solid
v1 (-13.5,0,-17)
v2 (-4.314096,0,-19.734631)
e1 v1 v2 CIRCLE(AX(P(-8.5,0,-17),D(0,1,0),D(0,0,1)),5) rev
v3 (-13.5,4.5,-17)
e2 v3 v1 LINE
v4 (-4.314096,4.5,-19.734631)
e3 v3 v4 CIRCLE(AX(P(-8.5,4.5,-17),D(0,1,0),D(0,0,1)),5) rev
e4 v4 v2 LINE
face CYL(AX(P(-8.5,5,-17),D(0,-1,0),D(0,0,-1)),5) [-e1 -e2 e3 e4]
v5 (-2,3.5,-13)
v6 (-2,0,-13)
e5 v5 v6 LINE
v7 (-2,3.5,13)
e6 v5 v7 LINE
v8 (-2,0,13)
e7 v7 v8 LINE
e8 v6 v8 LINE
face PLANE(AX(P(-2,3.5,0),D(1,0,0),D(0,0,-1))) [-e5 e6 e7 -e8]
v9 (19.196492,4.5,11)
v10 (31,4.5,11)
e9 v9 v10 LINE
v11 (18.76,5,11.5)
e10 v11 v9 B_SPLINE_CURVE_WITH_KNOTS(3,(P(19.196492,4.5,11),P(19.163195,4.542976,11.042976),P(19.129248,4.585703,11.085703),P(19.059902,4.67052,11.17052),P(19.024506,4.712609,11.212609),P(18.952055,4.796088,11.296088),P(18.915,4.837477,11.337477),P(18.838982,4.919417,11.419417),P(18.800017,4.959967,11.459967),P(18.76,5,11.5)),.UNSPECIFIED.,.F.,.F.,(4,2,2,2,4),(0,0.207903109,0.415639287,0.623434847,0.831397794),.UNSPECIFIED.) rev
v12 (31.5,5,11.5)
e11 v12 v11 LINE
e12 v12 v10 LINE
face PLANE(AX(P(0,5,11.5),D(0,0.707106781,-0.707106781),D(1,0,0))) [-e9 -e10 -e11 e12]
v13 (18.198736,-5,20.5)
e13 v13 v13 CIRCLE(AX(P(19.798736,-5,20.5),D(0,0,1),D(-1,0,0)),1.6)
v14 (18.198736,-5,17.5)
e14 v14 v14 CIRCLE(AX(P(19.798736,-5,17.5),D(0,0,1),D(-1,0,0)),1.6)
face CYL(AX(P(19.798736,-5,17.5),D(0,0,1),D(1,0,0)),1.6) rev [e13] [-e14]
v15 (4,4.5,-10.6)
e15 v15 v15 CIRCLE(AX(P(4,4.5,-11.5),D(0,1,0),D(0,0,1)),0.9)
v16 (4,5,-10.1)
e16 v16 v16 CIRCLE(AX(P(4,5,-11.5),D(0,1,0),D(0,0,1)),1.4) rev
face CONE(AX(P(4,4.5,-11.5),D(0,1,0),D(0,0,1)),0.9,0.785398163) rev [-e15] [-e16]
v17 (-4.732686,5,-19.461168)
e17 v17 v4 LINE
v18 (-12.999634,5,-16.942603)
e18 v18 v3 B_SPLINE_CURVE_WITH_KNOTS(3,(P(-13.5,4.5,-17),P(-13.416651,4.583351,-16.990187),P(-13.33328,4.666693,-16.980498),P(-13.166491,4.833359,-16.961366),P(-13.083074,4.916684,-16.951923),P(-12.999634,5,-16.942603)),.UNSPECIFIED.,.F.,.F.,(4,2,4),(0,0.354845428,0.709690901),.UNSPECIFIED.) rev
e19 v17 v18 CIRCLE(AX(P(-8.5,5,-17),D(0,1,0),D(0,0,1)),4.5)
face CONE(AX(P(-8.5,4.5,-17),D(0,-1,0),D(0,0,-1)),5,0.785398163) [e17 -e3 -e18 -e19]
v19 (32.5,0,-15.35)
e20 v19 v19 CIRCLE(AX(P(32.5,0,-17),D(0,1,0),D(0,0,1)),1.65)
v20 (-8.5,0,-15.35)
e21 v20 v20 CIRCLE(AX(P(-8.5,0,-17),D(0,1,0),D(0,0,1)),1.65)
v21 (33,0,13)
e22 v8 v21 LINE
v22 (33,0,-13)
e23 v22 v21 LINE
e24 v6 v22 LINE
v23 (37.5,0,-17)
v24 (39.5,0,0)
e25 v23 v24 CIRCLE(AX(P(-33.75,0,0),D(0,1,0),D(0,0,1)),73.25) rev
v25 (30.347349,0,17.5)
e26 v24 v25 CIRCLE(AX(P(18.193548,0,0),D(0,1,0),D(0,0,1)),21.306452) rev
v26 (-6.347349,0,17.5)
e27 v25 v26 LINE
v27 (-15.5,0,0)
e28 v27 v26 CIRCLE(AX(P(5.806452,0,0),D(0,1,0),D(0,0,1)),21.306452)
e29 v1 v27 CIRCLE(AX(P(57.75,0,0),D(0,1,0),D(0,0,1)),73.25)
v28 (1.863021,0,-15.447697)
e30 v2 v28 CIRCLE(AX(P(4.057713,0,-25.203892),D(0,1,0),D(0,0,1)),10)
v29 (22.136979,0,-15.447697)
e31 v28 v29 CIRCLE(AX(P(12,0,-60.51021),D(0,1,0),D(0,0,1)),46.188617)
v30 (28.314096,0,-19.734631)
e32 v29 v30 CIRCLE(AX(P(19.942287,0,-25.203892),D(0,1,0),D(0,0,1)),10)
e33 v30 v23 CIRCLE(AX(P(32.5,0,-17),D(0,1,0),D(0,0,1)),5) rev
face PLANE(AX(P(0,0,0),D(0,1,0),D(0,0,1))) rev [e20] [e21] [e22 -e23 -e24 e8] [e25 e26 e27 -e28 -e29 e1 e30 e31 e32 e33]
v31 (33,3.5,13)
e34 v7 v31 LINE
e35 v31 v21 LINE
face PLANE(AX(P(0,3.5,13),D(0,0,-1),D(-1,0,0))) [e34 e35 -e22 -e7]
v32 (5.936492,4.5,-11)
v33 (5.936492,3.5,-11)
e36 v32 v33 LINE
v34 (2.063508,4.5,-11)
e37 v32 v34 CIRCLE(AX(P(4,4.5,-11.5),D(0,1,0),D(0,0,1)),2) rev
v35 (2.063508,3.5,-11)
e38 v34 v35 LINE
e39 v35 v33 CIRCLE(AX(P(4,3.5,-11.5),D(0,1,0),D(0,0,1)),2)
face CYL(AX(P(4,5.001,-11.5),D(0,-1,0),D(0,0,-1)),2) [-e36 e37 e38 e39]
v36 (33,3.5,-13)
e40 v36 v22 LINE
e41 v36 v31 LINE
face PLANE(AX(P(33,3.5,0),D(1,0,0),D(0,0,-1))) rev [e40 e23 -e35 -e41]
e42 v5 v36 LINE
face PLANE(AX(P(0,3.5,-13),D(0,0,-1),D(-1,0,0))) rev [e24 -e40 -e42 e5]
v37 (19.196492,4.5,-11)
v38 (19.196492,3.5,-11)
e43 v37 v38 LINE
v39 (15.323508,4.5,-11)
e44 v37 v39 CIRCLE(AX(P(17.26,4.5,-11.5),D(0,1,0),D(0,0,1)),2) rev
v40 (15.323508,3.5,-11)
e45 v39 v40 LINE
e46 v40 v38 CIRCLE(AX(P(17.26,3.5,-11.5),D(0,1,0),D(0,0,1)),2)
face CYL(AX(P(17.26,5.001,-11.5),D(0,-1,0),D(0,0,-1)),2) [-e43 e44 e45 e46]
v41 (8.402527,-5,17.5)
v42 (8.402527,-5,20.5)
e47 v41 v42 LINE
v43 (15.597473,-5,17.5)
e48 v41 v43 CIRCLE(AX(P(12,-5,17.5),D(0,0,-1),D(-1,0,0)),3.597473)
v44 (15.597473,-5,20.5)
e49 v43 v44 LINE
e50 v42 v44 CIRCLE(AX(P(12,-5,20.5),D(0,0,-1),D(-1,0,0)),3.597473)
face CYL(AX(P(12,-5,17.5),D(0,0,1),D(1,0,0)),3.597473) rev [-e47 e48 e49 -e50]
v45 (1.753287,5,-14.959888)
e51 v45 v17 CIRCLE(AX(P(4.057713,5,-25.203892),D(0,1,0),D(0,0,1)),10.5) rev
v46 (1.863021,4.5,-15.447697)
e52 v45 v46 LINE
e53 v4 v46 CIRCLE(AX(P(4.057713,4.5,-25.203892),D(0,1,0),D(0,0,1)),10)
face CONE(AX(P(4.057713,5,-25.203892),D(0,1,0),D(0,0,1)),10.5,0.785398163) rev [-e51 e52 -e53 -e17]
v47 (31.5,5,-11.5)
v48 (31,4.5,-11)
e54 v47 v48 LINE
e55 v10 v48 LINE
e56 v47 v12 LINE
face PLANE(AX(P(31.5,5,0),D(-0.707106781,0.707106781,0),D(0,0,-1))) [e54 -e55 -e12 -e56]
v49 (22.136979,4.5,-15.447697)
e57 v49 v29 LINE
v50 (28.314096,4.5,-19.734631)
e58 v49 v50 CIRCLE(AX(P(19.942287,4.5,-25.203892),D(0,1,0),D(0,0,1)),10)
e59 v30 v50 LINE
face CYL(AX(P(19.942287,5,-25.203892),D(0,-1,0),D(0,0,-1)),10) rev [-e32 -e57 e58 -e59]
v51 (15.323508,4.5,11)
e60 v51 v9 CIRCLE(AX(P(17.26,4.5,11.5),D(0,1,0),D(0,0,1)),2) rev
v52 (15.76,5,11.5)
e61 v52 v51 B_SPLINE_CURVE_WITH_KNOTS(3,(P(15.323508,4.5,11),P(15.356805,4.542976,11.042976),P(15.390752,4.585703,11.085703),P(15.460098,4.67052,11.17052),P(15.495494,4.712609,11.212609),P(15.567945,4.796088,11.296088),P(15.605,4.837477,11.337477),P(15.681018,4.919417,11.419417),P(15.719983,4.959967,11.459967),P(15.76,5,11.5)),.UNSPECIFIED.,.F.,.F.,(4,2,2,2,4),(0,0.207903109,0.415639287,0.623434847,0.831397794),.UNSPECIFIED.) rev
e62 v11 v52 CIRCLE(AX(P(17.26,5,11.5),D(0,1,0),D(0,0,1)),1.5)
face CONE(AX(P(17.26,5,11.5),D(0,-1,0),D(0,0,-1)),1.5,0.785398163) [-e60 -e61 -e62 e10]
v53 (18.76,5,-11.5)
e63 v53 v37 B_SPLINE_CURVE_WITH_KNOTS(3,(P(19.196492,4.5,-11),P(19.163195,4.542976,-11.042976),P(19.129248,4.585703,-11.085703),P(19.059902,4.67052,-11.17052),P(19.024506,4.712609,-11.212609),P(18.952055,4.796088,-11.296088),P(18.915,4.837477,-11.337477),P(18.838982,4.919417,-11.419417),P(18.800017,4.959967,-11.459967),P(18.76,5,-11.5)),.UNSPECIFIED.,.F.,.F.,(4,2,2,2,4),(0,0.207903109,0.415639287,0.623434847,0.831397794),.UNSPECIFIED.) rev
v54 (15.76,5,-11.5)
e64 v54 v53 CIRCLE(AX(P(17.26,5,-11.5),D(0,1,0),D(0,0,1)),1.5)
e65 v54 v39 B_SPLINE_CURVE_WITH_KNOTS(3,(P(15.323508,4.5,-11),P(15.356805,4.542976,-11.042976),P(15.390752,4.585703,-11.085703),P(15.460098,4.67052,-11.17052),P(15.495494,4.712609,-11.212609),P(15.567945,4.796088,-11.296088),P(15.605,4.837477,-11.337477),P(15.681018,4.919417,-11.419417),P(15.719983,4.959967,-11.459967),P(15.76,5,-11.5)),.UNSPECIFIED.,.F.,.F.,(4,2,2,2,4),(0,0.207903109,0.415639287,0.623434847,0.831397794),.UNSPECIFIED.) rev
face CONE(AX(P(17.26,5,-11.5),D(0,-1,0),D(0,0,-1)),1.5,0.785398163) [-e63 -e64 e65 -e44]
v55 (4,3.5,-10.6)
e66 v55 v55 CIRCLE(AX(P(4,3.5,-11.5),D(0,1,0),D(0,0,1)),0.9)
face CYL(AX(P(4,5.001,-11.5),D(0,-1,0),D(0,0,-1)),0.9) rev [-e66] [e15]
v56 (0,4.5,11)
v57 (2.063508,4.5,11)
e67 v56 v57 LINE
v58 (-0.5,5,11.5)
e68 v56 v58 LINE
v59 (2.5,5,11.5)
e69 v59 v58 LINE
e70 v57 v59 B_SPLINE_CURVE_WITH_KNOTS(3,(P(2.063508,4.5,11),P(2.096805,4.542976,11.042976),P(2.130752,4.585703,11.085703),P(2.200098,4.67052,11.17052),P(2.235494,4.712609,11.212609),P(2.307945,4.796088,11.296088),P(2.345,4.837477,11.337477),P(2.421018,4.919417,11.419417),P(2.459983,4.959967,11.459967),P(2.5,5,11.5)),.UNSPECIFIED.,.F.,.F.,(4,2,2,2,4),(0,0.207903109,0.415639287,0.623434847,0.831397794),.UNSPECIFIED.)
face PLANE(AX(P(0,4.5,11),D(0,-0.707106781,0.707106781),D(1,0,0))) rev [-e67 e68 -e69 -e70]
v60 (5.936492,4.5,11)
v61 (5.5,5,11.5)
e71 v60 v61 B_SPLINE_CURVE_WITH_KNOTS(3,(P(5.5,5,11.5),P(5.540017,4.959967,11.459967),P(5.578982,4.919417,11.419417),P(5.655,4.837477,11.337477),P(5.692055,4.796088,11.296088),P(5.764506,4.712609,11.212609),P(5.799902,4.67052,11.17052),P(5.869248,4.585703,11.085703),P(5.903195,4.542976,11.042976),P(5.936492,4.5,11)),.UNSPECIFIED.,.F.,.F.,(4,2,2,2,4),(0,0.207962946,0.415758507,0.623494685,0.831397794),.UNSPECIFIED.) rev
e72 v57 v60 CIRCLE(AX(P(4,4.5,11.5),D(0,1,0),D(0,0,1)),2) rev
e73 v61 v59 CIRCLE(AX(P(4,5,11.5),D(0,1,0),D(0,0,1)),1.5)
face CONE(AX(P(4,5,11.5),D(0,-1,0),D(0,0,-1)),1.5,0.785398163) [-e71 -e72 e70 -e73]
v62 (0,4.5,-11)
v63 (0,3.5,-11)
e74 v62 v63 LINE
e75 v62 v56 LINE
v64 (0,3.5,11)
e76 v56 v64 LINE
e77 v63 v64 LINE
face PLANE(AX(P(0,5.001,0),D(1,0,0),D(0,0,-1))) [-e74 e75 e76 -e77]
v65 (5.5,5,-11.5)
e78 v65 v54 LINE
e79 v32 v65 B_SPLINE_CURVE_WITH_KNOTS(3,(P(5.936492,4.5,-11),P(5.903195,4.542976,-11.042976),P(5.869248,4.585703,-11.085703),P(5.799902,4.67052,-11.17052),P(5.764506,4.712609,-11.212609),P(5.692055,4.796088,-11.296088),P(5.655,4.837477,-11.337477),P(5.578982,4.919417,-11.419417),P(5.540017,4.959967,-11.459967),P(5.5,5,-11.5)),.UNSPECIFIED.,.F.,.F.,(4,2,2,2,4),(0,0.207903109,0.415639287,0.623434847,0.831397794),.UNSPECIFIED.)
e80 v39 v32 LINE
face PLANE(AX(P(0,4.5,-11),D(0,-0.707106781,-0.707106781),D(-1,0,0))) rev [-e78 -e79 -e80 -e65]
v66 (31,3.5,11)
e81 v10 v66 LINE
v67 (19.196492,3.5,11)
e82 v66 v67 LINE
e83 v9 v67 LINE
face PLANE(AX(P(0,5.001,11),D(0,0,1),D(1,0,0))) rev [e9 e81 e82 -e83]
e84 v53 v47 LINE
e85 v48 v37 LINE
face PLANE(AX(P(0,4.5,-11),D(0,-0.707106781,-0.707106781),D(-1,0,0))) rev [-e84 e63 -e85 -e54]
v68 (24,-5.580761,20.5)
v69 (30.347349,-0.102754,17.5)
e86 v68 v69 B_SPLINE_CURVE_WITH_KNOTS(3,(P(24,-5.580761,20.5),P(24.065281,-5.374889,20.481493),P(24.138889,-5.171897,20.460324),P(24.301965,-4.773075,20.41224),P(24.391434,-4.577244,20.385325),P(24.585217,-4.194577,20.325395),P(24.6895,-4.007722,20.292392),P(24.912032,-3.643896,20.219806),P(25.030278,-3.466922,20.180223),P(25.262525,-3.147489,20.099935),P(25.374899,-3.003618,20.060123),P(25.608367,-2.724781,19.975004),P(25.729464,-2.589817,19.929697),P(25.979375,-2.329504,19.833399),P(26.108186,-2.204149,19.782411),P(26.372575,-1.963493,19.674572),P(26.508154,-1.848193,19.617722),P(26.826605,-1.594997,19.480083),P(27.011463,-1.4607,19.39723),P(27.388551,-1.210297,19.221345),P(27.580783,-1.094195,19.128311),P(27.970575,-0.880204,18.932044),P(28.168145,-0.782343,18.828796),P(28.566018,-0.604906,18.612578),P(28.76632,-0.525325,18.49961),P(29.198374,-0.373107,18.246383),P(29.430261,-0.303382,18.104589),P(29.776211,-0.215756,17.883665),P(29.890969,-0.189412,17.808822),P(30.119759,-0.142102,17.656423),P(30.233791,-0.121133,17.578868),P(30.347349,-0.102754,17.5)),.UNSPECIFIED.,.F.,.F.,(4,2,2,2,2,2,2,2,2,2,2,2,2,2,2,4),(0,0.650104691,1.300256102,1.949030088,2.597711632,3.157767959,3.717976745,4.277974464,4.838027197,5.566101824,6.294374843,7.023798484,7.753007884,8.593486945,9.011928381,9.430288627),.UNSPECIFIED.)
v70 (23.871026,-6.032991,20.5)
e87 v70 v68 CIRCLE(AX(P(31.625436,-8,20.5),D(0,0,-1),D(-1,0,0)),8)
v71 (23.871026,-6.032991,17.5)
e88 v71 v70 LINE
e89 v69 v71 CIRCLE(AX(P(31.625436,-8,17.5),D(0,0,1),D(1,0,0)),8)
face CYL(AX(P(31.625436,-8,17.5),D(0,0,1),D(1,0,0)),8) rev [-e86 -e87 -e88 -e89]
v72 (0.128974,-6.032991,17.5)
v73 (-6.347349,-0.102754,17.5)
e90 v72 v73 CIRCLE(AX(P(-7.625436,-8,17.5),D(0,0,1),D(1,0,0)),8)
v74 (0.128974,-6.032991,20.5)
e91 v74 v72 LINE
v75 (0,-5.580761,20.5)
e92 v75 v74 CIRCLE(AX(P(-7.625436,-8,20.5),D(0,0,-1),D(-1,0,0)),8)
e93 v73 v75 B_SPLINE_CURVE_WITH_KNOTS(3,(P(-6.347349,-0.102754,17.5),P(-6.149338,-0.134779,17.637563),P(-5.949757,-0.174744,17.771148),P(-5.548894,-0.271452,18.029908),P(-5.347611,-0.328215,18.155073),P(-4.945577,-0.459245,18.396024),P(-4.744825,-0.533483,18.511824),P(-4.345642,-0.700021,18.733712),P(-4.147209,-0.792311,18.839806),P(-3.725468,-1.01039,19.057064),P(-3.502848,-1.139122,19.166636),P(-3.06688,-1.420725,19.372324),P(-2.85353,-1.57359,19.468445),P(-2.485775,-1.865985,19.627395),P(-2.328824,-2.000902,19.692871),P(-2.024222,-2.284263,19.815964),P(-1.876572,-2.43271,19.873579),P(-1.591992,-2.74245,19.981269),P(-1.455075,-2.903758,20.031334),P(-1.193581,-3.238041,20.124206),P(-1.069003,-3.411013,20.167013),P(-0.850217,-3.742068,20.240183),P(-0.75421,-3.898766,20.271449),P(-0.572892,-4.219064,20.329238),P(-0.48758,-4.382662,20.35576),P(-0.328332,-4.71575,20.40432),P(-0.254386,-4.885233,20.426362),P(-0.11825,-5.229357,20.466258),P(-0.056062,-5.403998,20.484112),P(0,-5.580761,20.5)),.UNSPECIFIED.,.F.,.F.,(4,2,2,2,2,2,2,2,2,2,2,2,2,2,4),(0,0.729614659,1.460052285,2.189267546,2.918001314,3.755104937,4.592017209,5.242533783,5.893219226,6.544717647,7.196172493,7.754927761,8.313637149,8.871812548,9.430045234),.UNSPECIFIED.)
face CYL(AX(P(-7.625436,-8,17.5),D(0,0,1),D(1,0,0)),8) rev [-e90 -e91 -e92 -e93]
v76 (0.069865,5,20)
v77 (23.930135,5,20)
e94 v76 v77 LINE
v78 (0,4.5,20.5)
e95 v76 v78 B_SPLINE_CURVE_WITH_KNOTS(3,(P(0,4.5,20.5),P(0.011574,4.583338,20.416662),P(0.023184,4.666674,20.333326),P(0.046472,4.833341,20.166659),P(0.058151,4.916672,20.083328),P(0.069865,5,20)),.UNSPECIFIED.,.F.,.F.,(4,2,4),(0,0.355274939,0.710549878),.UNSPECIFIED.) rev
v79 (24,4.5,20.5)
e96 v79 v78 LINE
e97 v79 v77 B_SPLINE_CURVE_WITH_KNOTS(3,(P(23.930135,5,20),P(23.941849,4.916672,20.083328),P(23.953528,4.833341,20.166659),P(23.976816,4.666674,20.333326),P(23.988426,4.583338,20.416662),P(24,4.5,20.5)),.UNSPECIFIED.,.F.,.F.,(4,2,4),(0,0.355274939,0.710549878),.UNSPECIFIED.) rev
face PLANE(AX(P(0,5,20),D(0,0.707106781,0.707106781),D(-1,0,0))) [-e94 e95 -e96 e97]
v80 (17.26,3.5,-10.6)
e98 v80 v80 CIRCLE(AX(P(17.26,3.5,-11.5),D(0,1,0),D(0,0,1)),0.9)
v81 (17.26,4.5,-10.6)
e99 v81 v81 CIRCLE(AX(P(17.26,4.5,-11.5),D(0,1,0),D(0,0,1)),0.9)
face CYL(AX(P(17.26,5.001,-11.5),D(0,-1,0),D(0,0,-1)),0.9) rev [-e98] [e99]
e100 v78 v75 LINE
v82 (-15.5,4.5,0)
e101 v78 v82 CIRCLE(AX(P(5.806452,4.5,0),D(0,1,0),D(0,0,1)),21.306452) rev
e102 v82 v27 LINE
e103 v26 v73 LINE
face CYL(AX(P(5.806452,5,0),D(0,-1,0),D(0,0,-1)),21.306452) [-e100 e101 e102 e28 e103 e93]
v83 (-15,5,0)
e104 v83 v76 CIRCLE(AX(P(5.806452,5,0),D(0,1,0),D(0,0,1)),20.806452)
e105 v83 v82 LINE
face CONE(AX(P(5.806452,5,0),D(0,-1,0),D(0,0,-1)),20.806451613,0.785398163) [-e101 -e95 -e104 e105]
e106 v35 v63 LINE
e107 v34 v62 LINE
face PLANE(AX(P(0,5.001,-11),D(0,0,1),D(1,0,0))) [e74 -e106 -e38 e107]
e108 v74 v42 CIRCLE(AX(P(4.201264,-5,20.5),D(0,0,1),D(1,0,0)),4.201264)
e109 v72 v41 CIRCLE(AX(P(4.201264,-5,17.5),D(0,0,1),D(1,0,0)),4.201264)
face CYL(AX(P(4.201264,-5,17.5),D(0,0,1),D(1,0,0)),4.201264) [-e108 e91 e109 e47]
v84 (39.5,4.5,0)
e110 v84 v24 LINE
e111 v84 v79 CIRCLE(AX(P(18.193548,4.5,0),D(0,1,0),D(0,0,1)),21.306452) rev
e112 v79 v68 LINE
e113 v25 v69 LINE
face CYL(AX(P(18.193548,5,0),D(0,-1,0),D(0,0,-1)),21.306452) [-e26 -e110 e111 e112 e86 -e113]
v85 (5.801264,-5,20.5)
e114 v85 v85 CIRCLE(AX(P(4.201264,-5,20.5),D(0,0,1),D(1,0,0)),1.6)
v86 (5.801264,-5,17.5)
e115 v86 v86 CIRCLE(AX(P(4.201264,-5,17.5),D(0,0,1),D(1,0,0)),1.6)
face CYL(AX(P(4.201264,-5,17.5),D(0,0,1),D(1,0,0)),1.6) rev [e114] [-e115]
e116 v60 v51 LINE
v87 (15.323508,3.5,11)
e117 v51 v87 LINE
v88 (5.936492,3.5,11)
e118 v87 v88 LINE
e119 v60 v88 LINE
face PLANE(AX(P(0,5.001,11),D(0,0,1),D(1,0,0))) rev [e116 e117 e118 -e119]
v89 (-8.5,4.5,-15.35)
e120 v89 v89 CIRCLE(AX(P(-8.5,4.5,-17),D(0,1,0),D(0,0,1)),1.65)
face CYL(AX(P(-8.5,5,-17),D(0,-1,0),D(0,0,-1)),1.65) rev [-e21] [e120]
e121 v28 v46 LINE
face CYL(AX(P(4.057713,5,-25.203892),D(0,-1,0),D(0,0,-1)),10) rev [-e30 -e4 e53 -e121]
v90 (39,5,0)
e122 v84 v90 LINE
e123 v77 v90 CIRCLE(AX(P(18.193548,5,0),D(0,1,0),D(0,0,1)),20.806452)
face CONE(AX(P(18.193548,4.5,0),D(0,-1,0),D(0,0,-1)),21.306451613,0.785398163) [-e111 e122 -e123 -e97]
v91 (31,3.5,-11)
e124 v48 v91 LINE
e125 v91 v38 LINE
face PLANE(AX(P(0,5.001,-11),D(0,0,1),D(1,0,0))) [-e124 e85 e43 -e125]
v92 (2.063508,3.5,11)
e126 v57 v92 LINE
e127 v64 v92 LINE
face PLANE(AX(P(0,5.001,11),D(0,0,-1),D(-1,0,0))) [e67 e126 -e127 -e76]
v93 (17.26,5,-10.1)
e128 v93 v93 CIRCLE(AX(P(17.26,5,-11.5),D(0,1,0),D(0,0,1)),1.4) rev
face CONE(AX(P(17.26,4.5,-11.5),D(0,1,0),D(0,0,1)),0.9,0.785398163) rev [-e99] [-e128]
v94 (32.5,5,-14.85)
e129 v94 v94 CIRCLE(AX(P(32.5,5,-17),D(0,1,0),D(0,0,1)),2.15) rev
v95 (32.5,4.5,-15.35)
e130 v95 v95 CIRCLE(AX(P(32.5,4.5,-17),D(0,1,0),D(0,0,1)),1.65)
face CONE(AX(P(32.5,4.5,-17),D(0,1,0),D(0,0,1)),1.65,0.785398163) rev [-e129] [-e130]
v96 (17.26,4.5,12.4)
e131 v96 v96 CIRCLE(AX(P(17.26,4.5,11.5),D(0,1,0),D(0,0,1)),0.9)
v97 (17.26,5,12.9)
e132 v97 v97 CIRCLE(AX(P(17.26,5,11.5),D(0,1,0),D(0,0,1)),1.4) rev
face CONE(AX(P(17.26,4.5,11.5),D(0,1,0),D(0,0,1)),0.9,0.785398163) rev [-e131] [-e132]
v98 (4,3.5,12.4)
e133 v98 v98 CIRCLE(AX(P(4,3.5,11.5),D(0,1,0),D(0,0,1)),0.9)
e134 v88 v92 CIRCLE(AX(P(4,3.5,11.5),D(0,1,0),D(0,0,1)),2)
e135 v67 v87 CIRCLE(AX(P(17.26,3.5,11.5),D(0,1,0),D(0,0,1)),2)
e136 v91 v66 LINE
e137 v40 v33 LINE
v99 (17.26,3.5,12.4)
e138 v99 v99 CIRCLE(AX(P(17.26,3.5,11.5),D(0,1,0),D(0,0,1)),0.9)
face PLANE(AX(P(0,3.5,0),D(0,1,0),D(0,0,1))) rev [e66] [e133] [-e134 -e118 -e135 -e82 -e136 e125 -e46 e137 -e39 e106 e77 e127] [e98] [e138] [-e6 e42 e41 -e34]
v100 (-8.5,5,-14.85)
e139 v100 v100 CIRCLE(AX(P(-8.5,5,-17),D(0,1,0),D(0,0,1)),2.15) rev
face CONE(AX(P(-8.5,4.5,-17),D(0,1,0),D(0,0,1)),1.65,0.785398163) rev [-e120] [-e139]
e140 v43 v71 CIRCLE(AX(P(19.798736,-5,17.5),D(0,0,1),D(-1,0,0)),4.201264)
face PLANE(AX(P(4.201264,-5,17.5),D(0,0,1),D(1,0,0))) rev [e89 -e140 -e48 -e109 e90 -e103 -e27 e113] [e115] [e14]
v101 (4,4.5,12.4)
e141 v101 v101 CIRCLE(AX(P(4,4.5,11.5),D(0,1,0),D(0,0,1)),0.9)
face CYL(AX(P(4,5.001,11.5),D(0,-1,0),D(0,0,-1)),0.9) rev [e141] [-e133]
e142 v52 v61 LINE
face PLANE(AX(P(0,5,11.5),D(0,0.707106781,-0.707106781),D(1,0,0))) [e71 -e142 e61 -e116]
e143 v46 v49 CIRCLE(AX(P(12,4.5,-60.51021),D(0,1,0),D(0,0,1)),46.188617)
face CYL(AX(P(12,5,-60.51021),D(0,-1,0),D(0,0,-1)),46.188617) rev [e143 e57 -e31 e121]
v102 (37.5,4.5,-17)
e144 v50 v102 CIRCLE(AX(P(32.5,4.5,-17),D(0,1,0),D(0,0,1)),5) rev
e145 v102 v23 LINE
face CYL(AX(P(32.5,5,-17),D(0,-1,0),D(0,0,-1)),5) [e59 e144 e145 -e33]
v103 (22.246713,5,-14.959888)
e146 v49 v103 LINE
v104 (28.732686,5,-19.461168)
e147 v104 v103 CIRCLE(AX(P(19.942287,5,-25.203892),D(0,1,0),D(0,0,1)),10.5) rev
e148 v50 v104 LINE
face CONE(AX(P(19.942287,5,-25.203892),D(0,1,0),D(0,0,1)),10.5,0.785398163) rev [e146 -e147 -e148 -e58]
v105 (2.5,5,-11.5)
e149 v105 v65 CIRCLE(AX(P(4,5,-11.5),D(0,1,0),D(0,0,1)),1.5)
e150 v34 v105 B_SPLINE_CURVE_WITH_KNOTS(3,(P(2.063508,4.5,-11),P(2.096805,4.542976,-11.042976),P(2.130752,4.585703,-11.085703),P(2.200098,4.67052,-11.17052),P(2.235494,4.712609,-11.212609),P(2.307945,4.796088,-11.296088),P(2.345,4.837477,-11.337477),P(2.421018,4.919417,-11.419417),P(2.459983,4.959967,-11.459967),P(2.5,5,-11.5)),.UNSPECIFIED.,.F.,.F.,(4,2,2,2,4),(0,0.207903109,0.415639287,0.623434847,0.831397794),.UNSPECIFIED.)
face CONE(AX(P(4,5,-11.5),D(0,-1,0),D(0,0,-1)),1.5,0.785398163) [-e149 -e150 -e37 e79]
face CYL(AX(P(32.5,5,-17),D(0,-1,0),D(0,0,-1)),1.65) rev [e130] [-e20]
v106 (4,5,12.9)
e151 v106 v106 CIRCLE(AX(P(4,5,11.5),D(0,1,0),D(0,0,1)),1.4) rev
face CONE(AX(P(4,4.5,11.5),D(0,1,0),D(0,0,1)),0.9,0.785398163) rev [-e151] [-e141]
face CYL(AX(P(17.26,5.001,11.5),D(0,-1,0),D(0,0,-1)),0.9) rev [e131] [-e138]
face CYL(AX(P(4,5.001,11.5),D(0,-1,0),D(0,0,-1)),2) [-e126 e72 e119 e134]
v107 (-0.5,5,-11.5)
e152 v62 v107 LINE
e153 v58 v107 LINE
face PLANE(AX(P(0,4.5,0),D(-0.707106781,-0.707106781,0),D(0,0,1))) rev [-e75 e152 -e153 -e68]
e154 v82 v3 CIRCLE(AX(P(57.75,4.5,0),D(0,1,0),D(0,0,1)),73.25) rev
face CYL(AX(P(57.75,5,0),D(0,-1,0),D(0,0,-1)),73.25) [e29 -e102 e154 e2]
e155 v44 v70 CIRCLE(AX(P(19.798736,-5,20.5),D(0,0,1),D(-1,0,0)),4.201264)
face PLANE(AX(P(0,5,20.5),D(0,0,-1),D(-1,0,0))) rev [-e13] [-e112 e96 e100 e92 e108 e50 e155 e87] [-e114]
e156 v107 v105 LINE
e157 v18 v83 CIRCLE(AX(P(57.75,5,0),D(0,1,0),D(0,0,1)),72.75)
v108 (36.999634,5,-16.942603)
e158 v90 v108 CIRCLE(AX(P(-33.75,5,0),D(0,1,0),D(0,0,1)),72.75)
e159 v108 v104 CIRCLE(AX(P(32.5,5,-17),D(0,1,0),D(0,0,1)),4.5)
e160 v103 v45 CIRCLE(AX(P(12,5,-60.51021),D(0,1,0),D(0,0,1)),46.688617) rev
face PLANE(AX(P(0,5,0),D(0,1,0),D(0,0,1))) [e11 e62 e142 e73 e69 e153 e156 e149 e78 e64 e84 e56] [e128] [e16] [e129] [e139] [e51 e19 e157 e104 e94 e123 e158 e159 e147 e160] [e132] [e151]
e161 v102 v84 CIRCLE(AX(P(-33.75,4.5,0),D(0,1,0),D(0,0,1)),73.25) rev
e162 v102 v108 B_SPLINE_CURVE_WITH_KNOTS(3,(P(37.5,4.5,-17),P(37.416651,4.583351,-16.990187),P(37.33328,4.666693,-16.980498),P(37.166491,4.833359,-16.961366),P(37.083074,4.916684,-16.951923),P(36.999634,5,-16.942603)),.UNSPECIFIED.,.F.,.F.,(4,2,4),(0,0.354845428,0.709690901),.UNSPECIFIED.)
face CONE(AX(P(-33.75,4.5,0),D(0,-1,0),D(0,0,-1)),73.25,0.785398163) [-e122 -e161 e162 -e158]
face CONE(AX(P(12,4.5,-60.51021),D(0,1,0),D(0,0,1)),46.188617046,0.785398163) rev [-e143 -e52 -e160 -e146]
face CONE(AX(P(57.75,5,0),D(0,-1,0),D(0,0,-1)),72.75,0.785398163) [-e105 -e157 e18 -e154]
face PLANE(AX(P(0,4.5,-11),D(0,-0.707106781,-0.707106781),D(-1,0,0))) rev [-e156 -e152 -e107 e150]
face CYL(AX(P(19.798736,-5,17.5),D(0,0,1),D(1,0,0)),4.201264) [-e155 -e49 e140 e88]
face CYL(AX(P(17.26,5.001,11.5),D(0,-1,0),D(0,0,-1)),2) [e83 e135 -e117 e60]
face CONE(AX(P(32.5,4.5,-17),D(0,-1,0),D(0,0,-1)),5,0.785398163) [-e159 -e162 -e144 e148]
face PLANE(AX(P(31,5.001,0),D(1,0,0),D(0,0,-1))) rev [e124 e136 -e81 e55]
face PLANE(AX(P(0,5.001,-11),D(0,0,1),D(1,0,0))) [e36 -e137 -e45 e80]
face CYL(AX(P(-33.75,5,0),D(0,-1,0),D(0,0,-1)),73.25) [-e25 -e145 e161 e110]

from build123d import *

# Parameters (mm, degrees)
COMPLETE_SKETCH_R               = 1.6
COMPLETE_SKETCH_R_2             = 1.65
BODY_DEPTH                      = 5
SMOOTHING_FILLET_R              = 10
CUT_EXTRUDE1_START              = -5
SKETCH1_R                       = 0.9
CUT_EXTRUDE1_DEPTH              = 5
CUT_EXTRUDE2_START              = -5
SKETCH1_4_W                     = 35
SKETCH1_4_H                     = 26
CUT_EXTRUDE2_DEPTH              = 3.5
ELEPHANTSFOOT_COMPENSATION_SIZE = 0.5
SKETCH5_R                       = 1.6
BOSS_EXTRUDE3_DEPTH             = 3
FILLET3_R                       = 8


with BuildPart() as part:
    # complete_sketch → body (new body)
    with BuildSketch(Plane(origin=(0, 0, 0), x_dir=(1, 0, 0), z_dir=(0, 1, 0))):
        with BuildLine():
            Line((0, -20.5), (24, -20.5))
            ThreePointArc((24, -20.5), (35.188838333, -12.850097276), (39.5, 0))
            ThreePointArc((39.5, 0), (38.998281767, 8.558621384), (37.5, 17))
            ThreePointArc((37.5, 17), (32.5, 22), (27.5, 17))
            ThreePointArc((27.5, 17), (12, 14.321592614), (-3.5, 17))
            ThreePointArc((-3.5, 17), (-8.5, 22), (-13.5, 17))
            ThreePointArc((-13.5, 17), (-14.998281767, 8.558621384), (-15.5, 0))
            ThreePointArc((-15.5, 0), (-11.188838333, -12.850097276), (0, -20.5))
        make_face()
        with Locations(Location((24, 0, 0), (0, 0, 270))):
            Circle(COMPLETE_SKETCH_R, mode=Mode.SUBTRACT)
        with Locations(Location((-8.5, 17, 0), (0, 0, 270))):
            Circle(COMPLETE_SKETCH_R_2, mode=Mode.SUBTRACT)
        with Locations(Location((32.5, 17, 0), (0, 0, 270))):
            Circle(COMPLETE_SKETCH_R_2, mode=Mode.SUBTRACT)
    extrude(amount=BODY_DEPTH)

    # smoothing_fillet
    smoothing_fillet_edges = [part.edges().sort_by_distance(p)[0] for p in [
        (-3.5, 2.5, -17),
        (27.5, 2.5, -17),
    ]]
    fillet(smoothing_fillet_edges, radius=SMOOTHING_FILLET_R)

    # Sketch1 → Cut-Extrude1 (cut)
    with BuildSketch(Plane(origin=(0, 5, 0), x_dir=(1, 0, 0), z_dir=(0, 1, 0)).offset(CUT_EXTRUDE1_START)):
        with BuildLine():
            Line((31, -11), (31, 11))
            Line((31, 11), (19.196491673, 11))
            ThreePointArc((19.196491673, 11), (17.26, 9.5), (15.323508327, 11))
            Line((15.323508327, 11), (5.936491673, 11))
            ThreePointArc((5.936491673, 11), (4, 9.5), (2.063508327, 11))
            Line((2.063508327, 11), (0, 11))
            Line((0, 11), (0, -11))
            Line((0, -11), (2.063508327, -11))
            ThreePointArc((2.063508327, -11), (4, -9.5), (5.936491673, -11))
            Line((5.936491673, -11), (15.323508327, -11))
            ThreePointArc((15.323508327, -11), (17.26, -9.5), (19.196491673, -11))
            Line((19.196491673, -11), (31, -11))
        make_face()
        with Locations(Location((4, 11.5, 0), (0, 0, 270))):
            Circle(SKETCH1_R)
        with Locations(Location((17.26, 11.5, 0), (0, 0, 270))):
            Circle(SKETCH1_R)
        with Locations(Location((17.26, -11.5, 0), (0, 0, 270))):
            Circle(SKETCH1_R)
        with Locations(Location((4, -11.5, 0), (0, 0, 270))):
            Circle(SKETCH1_R)
    extrude(amount=CUT_EXTRUDE1_DEPTH, mode=Mode.SUBTRACT)

    # Sketch1<4> → Cut-Extrude2 (cut)
    with BuildSketch(Plane(origin=(0, 5, 0), x_dir=(1, 0, 0), z_dir=(0, 1, 0)).offset(CUT_EXTRUDE2_START)):
        with Locations((15.5, 0)):
            Rectangle(SKETCH1_4_W, SKETCH1_4_H)
    extrude(amount=CUT_EXTRUDE2_DEPTH, mode=Mode.SUBTRACT)

    # elephantsfoot_compensation
    elephantsfoot_compensation_edges = [part.edges().sort_by_distance(p)[0] for p in [
        (33.926618039, 5, -21.792156192),
        (25.643793964, 5, -16.988490587),
        (38.998281767, 5, -8.558621384),
        (12, 5, -14.321592614),
        (35.188838333, 5, 12.850097276),
        (-1.643793964, 5, -16.988490587),
        (12, 5, 20.5),
        (-9.926618039, 5, -21.792156192),
        (-11.188838333, 5, 12.850097276),
        (-14.998281767, 5, -8.558621384),
        (4, 5, 10.6),
        (17.26, 5, 10.6),
        (17.26, 5, 9.5),
        (25.098245837, 5, 11),
        (31, 5, 0),
        (25.098245837, 5, -11),
        (17.26, 5, -9.5),
        (10.63, 5, -11),
        (4, 5, -9.5),
        (1.031754163, 5, -11),
        (0, 5, 0),
        (1.031754163, 5, 11),
        (4, 5, 9.5),
        (10.63, 5, 11),
        (-8.5, 5, -18.65),
        (4, 5, -12.4),
        (17.26, 5, -12.4),
        (32.5, 5, -18.65),
    ]]
    chamfer(elephantsfoot_compensation_edges, length=ELEPHANTSFOOT_COMPENSATION_SIZE)

    # Sketch5 → Boss-Extrude3 (add)
    with BuildSketch(Plane.XY.offset(20.5)):
        with BuildLine():
            Line((0, -5), (0, 0))
            Line((0, 0), (8.402527049, 0))
            Line((8.402527049, 0), (15.597472951, 0))
            Line((15.597472951, 0), (24, 0))
            Line((24, 0), (24, -5))
            ThreePointArc((24, -5), (19.798736476, -9.201263524), (15.597472951, -5))
            ThreePointArc((15.597472951, -5), (12, -1.402527049), (8.402527049, -5))
            ThreePointArc((8.402527049, -5), (4.201263524, -9.201263524), (0, -5))
        make_face()
        with Locations((4.201263524, -5)):
            Circle(SKETCH5_R, mode=Mode.SUBTRACT)
        with Locations(Location((19.798736476, -5, 0), (0, 0, 180))):
            Circle(SKETCH5_R, mode=Mode.SUBTRACT)
    extrude(amount=-BOSS_EXTRUDE3_DEPTH)

    # Fillet3
    # the kernel refuses this fillet: 8 mm, written as the material it adds along each edge
    with BuildSketch(Plane(origin=(0, 0, 20.5), x_dir=(-1, 0, 0), z_dir=(0, 0, -1))) as fillet3_piece_1_section:
        with BuildLine():
            CenterArc((7.625436421, -8), FILLET3_R, 90, 75.766381177)
            Line((-0.128973553, -6.032990604), (-0.90441455, -5.836289664))
            ThreePointArc((-0.90441455, -5.836289664), (-0.8, -5), (-0.8, 0))
            Line((-0.8, 0), (0, 0.8))
            Line((0, 0.8), (7.625436421, 0.8))
            Line((7.625436421, 0.8), (7.625436421, 0))
        make_face()
    fillet3_piece_1 = extrude(amount=3, mode=Mode.PRIVATE)
    fillet3_piece_1 = fillet3_piece_1 & Plane(origin=(5.806451613, -0.853747652, 0), x_dir=(-1, 0, 0), z_dir=(0, -1, 0)) * Cylinder(21.306451613, 37, mode=Mode.PRIVATE)
    add(fillet3_piece_1)
    with BuildSketch(Plane(origin=(24, 0, 20.5), x_dir=(1, 0, 0), z_dir=(0, 0, -1))) as fillet3_piece_2_section:
        with BuildLine():
            CenterArc((7.625436421, 8), FILLET3_R, 194.233618823, 75.766381177)
            Line((-0.128973553, 6.032990604), (-0.90441455, 5.836289664))
            ThreePointArc((-0.90441455, 5.836289664), (-0.8, 5), (-0.8, 0))
            Line((-0.8, 0), (0, -0.8))
            Line((0, -0.8), (7.625436421, -0.8))
            Line((7.625436421, -0.8), (7.625436421, 0))
        make_face()
    fillet3_piece_2 = extrude(amount=3, mode=Mode.PRIVATE)
    fillet3_piece_2 = fillet3_piece_2 & Plane(origin=(18.193548387, -2.088066401, 0), x_dir=(0.27252081756245267, 0, 0.9621498864496595), z_dir=(0, -1, 0)) * Cylinder(21.306451613, 37, mode=Mode.PRIVATE)
    add(fillet3_piece_2)


solid = part.part
